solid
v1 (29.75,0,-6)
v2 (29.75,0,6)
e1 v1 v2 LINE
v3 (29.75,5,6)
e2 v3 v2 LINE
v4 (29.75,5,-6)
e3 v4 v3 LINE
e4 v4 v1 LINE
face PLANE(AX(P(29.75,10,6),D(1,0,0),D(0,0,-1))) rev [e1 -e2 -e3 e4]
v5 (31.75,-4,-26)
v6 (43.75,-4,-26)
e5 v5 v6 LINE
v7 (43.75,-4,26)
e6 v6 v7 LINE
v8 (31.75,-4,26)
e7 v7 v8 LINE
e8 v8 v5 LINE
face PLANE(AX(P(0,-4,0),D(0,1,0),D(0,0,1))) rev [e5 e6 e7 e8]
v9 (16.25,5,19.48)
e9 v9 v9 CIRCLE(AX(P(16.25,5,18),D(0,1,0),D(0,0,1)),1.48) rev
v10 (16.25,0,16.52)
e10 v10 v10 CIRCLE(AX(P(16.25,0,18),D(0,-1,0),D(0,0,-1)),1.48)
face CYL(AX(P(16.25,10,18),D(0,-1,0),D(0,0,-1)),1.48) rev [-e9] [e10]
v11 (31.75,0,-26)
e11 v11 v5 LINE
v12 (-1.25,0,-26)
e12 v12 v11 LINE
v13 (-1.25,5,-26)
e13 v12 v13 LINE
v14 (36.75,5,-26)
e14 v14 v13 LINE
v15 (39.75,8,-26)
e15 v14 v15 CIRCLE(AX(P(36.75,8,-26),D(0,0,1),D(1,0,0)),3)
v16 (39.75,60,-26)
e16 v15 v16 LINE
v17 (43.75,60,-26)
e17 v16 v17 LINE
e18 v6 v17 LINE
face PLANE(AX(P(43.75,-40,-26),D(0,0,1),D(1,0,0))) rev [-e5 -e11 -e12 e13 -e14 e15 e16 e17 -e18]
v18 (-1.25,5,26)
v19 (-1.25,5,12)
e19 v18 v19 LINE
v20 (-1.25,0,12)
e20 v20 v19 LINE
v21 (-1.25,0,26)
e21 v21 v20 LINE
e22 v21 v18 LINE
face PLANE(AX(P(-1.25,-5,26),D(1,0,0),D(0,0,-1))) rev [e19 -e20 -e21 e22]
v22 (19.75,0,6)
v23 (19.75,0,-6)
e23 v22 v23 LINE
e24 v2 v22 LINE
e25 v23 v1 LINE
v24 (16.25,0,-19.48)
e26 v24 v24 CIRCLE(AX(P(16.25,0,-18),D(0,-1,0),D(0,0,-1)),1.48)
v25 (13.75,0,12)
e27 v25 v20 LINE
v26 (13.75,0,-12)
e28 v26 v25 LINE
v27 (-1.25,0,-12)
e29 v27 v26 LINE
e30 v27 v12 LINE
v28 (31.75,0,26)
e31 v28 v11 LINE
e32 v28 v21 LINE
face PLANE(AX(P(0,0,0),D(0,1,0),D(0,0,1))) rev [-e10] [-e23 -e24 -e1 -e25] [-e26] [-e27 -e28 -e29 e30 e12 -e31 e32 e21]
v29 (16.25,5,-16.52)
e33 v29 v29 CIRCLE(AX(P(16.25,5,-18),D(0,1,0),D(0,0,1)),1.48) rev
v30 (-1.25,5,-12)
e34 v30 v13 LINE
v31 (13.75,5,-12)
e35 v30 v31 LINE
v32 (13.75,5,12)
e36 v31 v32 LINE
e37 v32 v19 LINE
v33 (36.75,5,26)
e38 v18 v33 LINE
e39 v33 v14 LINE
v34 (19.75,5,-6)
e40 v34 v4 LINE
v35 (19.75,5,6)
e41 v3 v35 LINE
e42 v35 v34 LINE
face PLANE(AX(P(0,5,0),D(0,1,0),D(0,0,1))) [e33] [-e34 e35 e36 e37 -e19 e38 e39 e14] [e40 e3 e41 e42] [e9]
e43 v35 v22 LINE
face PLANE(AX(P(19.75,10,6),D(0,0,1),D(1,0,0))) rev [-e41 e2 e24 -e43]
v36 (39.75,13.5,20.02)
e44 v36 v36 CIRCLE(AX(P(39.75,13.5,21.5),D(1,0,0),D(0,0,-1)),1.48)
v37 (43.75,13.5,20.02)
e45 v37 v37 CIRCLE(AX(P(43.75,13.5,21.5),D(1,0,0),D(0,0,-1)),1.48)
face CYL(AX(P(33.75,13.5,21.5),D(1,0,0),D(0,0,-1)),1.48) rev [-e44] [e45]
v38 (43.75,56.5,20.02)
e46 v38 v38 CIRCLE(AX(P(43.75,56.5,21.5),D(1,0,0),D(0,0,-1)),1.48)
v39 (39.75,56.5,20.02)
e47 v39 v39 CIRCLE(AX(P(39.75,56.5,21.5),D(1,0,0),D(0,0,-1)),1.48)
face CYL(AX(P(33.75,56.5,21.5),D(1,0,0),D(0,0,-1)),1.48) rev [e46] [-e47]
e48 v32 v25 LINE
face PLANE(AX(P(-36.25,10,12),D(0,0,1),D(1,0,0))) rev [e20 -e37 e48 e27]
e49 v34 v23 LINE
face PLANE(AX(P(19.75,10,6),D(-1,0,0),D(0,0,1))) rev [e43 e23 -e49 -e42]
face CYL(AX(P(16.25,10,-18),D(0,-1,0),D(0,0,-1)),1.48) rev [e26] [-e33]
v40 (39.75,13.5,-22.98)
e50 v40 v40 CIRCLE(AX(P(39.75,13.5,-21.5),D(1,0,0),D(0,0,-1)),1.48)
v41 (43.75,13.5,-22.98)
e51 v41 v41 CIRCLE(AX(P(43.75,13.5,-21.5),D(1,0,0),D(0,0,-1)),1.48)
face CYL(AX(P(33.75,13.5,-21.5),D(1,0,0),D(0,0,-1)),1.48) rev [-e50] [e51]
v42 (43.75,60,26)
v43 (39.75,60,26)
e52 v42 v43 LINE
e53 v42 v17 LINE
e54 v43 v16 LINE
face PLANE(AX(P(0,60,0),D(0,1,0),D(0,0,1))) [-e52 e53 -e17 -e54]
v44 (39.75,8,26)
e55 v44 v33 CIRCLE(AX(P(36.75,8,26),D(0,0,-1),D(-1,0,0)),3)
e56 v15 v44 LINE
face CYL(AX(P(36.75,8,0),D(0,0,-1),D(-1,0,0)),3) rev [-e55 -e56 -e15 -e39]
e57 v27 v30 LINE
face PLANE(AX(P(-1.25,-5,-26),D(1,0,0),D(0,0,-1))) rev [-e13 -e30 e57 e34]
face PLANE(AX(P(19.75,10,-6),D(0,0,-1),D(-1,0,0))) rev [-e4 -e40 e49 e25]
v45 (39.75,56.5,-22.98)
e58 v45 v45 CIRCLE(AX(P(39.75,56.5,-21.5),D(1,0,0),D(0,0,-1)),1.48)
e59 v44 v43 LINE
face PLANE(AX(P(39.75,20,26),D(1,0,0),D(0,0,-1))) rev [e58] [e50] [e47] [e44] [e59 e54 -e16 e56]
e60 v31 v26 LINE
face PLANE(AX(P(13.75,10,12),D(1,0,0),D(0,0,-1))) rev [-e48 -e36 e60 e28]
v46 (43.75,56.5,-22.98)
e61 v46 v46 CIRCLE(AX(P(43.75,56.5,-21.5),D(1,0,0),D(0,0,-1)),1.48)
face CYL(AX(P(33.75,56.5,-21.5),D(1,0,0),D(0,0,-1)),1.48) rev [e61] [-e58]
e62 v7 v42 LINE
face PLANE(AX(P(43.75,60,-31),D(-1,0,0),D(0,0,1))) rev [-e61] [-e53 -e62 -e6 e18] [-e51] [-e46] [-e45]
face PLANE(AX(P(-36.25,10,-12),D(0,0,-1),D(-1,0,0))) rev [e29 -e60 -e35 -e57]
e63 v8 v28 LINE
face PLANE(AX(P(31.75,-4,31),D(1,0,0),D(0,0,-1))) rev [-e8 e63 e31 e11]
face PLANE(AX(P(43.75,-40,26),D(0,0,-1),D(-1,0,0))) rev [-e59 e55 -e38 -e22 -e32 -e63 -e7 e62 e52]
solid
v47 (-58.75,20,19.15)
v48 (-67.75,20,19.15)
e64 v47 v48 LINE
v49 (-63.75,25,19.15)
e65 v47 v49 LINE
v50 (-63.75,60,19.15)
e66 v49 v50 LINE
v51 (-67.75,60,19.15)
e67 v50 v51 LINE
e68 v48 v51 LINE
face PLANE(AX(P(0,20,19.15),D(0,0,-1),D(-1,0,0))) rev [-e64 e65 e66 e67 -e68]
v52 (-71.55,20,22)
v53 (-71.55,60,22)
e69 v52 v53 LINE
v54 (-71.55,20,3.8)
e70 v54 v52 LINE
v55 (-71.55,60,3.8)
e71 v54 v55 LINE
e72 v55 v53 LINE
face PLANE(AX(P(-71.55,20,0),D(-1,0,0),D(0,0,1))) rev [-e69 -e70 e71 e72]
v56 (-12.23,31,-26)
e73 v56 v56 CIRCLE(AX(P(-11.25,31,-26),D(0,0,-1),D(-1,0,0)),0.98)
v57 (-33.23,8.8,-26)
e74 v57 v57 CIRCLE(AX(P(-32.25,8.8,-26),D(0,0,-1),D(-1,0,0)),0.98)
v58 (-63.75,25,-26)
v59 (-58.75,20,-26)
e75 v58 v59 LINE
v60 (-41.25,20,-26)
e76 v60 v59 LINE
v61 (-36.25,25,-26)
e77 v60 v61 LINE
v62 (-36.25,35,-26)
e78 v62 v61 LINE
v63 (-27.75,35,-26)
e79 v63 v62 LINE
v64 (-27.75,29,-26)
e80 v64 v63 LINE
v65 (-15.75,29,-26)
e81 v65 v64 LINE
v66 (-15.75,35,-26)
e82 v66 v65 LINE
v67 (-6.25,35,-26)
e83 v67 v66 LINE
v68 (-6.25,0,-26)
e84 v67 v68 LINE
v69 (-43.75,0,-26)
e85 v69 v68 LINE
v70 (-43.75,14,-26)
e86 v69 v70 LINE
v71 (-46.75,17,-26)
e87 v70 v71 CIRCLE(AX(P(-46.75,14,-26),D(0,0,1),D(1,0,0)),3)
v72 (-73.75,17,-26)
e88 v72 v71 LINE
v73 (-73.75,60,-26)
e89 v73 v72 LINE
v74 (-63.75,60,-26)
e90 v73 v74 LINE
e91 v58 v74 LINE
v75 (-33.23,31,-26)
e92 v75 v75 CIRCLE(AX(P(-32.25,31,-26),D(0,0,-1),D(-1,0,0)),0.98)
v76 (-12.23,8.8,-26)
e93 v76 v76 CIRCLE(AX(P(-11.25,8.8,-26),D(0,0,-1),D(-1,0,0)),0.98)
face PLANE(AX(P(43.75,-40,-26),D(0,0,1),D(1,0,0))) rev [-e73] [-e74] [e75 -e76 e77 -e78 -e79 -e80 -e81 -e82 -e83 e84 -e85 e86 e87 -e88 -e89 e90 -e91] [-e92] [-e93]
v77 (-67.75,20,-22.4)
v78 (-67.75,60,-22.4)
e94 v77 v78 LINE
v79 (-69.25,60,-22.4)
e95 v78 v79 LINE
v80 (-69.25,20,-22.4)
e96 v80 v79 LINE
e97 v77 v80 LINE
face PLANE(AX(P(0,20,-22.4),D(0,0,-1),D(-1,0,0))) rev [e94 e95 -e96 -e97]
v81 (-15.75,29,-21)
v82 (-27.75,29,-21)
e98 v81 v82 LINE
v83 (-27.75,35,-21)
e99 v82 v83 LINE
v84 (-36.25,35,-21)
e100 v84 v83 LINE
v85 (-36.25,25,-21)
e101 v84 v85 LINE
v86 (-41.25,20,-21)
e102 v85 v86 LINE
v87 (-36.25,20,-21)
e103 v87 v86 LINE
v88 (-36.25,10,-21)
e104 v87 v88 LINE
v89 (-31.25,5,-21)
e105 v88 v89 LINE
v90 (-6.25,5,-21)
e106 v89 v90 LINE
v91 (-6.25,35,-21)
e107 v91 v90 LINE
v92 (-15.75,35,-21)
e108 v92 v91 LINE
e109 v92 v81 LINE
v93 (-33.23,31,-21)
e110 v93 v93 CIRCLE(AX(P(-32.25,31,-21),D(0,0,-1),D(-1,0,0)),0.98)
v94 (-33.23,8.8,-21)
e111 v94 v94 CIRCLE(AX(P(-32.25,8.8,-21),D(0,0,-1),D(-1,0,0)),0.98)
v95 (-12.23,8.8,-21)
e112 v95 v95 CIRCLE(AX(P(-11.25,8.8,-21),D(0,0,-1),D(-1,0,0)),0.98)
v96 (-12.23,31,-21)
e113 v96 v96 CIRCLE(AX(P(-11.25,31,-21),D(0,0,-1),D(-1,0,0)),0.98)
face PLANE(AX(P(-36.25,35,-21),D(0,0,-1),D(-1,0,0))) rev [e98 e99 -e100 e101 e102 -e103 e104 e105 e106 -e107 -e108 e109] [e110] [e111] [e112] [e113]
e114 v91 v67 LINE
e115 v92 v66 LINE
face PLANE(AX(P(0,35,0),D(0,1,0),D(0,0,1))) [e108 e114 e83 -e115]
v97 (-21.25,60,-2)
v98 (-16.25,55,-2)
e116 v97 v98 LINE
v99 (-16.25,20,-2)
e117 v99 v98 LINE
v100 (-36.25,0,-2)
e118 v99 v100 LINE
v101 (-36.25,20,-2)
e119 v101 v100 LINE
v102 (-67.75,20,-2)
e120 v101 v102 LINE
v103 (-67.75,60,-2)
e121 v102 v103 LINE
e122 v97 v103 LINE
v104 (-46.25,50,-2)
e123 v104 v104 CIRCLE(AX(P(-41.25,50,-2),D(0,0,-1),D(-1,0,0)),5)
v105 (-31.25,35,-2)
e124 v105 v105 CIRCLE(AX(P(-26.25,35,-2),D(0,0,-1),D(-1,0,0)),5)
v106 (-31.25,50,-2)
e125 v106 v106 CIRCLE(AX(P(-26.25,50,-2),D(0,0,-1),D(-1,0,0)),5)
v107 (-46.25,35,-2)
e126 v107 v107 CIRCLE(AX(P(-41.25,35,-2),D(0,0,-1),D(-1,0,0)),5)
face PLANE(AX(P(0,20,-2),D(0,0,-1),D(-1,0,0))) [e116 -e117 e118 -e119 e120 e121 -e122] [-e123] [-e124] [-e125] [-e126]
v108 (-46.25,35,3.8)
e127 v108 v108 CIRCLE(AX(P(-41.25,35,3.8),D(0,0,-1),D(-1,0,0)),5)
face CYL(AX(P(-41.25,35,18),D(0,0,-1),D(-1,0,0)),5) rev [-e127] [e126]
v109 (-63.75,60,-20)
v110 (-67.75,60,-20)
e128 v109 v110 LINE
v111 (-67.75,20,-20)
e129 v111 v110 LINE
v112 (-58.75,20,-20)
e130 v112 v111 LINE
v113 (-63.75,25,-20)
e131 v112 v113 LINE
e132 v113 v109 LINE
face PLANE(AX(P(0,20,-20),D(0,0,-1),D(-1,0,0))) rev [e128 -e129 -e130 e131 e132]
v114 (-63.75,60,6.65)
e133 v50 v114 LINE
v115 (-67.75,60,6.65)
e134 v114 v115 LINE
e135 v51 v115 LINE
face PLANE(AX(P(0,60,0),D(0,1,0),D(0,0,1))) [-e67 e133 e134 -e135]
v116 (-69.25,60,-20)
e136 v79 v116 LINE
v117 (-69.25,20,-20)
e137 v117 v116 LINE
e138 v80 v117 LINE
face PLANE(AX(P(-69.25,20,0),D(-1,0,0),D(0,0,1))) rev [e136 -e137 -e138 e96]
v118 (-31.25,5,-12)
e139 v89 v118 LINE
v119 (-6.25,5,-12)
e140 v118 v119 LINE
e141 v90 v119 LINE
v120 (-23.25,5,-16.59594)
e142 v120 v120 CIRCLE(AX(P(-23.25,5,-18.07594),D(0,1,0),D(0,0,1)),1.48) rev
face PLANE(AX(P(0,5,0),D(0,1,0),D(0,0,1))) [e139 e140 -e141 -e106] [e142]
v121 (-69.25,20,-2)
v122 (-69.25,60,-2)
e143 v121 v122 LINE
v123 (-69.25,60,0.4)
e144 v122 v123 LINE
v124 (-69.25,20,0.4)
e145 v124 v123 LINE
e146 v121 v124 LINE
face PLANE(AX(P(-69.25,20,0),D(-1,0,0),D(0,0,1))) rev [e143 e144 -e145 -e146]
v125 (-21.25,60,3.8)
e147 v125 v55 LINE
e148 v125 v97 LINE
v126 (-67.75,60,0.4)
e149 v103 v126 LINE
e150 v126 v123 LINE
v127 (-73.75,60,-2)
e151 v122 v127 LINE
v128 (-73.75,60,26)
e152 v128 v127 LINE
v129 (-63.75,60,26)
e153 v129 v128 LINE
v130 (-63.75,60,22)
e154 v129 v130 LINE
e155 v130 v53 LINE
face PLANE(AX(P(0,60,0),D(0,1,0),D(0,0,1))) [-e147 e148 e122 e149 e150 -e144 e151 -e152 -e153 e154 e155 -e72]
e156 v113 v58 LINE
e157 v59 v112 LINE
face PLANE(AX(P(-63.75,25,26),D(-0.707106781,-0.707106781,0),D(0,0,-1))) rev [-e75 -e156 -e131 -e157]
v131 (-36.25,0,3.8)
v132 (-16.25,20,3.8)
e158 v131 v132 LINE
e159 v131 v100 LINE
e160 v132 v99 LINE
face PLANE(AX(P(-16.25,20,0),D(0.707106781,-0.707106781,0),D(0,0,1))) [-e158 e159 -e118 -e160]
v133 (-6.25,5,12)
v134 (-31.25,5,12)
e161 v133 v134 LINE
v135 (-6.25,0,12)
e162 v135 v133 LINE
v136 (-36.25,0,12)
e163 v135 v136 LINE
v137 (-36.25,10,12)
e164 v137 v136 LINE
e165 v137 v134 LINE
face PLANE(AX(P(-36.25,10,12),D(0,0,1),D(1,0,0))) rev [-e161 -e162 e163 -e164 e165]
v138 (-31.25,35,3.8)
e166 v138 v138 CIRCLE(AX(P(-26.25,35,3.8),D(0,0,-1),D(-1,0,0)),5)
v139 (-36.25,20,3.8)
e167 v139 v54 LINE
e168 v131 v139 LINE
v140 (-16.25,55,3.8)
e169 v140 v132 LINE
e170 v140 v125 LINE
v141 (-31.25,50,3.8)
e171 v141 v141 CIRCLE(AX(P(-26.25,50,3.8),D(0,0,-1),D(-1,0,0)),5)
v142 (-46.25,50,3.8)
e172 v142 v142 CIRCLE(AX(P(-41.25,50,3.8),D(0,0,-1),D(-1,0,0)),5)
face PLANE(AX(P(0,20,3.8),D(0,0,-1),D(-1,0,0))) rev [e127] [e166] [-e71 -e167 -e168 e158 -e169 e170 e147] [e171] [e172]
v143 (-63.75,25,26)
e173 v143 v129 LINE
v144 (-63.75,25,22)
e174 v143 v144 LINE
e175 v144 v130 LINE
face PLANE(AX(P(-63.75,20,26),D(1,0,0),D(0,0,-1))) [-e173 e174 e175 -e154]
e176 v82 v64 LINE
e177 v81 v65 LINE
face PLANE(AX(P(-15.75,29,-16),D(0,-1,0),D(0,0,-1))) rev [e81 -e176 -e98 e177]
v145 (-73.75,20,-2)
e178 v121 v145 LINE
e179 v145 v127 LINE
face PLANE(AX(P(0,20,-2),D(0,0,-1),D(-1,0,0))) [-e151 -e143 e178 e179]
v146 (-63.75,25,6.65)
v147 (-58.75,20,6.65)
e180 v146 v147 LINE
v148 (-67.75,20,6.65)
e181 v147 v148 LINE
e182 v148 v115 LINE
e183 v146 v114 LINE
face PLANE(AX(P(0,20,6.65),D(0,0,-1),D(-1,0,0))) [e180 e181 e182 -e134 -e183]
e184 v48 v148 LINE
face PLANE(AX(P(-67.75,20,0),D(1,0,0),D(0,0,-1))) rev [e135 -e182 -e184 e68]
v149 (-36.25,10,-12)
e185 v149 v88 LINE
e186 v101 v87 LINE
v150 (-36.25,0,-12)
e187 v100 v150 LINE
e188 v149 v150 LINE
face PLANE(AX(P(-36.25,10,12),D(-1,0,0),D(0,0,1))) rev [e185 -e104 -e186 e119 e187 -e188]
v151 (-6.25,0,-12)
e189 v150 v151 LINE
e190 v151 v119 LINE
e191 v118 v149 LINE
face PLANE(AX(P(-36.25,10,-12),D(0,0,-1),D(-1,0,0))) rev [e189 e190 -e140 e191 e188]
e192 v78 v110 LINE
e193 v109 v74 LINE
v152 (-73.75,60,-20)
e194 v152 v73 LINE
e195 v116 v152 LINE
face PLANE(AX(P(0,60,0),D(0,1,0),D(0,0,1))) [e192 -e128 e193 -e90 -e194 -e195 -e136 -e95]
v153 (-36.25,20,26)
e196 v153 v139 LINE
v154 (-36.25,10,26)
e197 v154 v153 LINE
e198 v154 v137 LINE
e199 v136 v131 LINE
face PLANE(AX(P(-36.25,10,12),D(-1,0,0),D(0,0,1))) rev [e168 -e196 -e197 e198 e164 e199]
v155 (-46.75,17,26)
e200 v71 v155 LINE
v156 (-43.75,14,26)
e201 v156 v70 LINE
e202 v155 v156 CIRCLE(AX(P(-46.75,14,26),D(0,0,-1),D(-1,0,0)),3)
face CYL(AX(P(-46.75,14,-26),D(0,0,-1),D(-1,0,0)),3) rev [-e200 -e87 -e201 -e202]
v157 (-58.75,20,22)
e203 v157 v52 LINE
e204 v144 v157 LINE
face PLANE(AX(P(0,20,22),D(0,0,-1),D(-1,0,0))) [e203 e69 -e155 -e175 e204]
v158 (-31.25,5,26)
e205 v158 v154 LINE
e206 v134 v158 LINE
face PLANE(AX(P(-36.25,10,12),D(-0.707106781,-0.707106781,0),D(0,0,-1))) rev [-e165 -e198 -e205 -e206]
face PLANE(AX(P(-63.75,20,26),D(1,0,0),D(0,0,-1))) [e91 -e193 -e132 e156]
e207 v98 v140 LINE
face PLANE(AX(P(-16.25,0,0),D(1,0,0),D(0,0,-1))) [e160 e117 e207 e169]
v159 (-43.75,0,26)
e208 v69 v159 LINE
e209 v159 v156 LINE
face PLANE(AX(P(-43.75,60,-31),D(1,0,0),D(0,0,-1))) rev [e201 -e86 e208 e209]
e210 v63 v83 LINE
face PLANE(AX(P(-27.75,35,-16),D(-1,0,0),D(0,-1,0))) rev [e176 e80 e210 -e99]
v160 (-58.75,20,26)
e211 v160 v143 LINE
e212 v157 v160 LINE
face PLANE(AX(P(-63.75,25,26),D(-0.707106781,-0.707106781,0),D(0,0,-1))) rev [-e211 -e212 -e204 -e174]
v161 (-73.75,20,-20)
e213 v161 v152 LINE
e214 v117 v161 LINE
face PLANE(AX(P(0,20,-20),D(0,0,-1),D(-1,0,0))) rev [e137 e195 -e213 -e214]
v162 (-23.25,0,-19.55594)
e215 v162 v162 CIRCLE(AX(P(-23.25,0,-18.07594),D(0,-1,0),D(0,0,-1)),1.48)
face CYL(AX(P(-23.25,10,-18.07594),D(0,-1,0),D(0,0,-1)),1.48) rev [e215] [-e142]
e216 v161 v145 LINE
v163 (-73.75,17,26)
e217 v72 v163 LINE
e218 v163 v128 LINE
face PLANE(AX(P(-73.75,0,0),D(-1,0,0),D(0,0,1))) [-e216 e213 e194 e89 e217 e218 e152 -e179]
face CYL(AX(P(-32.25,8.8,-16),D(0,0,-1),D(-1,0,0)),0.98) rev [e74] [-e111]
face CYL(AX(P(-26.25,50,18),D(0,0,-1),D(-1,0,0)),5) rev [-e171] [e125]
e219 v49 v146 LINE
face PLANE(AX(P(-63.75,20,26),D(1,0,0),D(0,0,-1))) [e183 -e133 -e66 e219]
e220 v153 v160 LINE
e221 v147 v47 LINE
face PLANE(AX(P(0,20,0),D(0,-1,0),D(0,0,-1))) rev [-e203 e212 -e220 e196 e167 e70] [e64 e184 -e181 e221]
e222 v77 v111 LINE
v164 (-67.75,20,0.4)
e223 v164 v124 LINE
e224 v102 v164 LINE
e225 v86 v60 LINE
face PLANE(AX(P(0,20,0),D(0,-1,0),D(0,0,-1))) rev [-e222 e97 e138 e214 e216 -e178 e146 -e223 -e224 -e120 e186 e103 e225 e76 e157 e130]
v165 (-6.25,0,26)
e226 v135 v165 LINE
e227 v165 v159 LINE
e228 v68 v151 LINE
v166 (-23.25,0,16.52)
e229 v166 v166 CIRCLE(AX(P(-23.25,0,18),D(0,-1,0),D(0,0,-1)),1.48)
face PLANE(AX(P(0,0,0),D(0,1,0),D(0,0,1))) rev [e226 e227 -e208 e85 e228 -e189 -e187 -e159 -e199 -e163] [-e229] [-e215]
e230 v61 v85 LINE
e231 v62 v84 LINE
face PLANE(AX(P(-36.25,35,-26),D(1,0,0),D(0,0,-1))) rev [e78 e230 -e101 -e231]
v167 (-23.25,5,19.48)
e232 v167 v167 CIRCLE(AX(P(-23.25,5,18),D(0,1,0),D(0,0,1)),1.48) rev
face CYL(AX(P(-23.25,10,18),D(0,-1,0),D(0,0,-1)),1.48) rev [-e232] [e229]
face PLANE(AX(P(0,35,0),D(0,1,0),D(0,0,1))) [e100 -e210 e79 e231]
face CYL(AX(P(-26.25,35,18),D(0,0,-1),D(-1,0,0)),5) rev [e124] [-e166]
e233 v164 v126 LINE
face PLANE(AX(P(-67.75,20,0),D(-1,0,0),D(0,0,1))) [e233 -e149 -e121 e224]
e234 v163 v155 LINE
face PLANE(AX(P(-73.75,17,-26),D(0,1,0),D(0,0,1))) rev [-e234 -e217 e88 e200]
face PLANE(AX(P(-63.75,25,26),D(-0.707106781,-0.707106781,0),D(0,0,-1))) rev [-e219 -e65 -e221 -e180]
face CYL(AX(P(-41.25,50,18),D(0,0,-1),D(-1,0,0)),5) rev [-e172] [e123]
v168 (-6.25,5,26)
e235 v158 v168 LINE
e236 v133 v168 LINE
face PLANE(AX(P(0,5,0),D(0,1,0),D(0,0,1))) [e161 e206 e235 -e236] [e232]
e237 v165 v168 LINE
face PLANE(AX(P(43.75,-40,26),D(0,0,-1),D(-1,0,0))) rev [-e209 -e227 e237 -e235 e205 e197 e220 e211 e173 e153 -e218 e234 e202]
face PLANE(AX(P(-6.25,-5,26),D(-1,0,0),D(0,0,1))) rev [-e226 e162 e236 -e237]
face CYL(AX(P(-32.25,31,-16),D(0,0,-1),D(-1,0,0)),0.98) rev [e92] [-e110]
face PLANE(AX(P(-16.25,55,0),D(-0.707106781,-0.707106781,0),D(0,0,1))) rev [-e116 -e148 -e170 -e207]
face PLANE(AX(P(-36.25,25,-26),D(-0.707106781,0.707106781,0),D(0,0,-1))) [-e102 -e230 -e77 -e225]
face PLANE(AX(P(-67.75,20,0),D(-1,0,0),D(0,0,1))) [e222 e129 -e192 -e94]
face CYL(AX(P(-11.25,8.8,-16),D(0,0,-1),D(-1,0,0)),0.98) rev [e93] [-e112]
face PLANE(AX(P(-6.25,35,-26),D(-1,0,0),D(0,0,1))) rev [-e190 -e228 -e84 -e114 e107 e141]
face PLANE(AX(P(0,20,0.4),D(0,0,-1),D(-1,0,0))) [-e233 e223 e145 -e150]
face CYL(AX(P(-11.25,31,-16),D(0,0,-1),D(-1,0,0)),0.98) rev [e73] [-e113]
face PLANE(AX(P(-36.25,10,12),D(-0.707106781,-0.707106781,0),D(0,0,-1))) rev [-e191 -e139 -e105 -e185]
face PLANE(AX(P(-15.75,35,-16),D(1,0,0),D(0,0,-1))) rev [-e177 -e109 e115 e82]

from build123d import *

# Parameters (mm, degrees)
SKETCH_1_W           = 87.5
SKETCH_1_H           = 62
EXTRUDE_1_DEPTH      = 60
SKETCH_2_W           = 12
SKETCH_2_H           = 62
EXTRUDE_2_DEPTH      = 4
SKETCH_4_R           = 1.48
SKETCH_4_W           = 10
SKETCH_4_H           = 12
SKETCH_4_W_2         = 50
SKETCH_4_H_2         = 24
CUT_EXTRUDE_2_DEPTH  = 10
SKETCH_6_W           = 87.5
SKETCH_6_H           = 5
CUT_EXTRUDE_3_DEPTH  = 100
SKETCH_7_W           = 52
SKETCH_7_H           = 43
EXTRUDE_3_DEPTH      = 30
SKETCH_9_W           = 103.5
SKETCH_9_H           = 52
CUT_EXTRUDE_4_DEPTH  = 40
SKETCH_10_W          = 76
SKETCH_10_H          = 52
CUT_EXTRUDE_5_DEPTH  = 15
SKETCH_11_R          = 1.48
CUT_EXTRUDE_6_DEPTH  = 10
CUT_EXTRUDE_7_DEPTH  = 40
SKETCH_12_4_W        = 4
SKETCH_12_4_H        = 18
SKETCH_12_4_W_2      = 4.5
CUT_EXTRUDE_8_DEPTH  = 40
SKETCH_13_W          = 27.5
SKETCH_13_H          = 5.8
EXTRUDE_4_DEPTH      = 40
SKETCH_14_W          = 30
SKETCH_14_H          = 5
EXTRUDE_5_DEPTH      = 30
SKETCH_15_R          = 0.98
SKETCH_15_W          = 12
SKETCH_15_H          = 6
CUT_EXTRUDE_9_DEPTH  = 10
FILLET_2_R           = 3
SKETCH_16_W          = 5
SKETCH_16_H          = 14
CUT_EXTRUDE_10_DEPTH = 10
CHAMFER_4_SIZE       = 5
SKETCH_17_W          = 5.8
SKETCH_17_H          = 40
EXTRUDE_6_DEPTH      = 20
CHAMFER_5_SIZE       = 20
CHAMFER_6_SIZE       = 5
SKETCH_18_R          = 5
CUT_EXTRUDE_11_DEPTH = 20
FILLET_3_R           = 3


with BuildPart() as part:
    # 草图1 → 凸台-拉伸1 (new body)
    with BuildSketch(Plane(origin=(0, 0, 0), x_dir=(1, 0, 0), z_dir=(0, 1, 0))):
        Rectangle(SKETCH_1_W, SKETCH_1_H)
    extrude(amount=EXTRUDE_1_DEPTH)

    # 草图2 → 凸台-拉伸2 (add)
    with BuildSketch(Plane.XZ):
        with Locations((37.75, 0)):
            Rectangle(SKETCH_2_W, SKETCH_2_H)
    extrude(amount=EXTRUDE_2_DEPTH)

    # 草图4 → 切除-拉伸2 (cut)
    with BuildSketch(Plane.XZ):
        with Locations(Location((16.25, -18, 0), (0, 0, 270))):
            Circle(SKETCH_4_R)
        with Locations(Location((-23.25, -18.075939793, 0), (0, 0, 270))):
            Circle(SKETCH_4_R)
        with Locations(Location((-23.25, 18, 0), (0, 0, 270))):
            Circle(SKETCH_4_R)
        with Locations(Location((16.25, 18, 0), (0, 0, 270))):
            Circle(SKETCH_4_R)
        with Locations((24.75, 0)):
            Rectangle(SKETCH_4_W, SKETCH_4_H)
        with Locations((-11.25, 0)):
            Rectangle(SKETCH_4_W_2, SKETCH_4_H_2)
    extrude(amount=-CUT_EXTRUDE_2_DEPTH, mode=Mode.SUBTRACT)

    # 草图6 → 切除-拉伸3 (cut)
    with BuildSketch(Plane(origin=(0, 60, 0), x_dir=(1, 0, 0), z_dir=(0, 1, 0))):
        with Locations((0, -28.5)):
            Rectangle(SKETCH_6_W, SKETCH_6_H)
        with Locations((0, 28.5)):
            Rectangle(SKETCH_6_W, SKETCH_6_H)
    extrude(amount=-CUT_EXTRUDE_3_DEPTH, mode=Mode.SUBTRACT)

    # 草图7 → 凸台-拉伸3 (add)
    with BuildSketch(Plane.ZY.offset(43.75)):
        with Locations((0, 38.5)):
            Rectangle(SKETCH_7_W, SKETCH_7_H)
    extrude(amount=EXTRUDE_3_DEPTH)

    # 草图9 → 切除-拉伸4 (cut)
    with BuildSketch(Plane(origin=(0, 60, 0), x_dir=(1, 0, 0), z_dir=(0, 1, 0))):
        with Locations((-12, 0)):
            Rectangle(SKETCH_9_W, SKETCH_9_H)
    extrude(amount=-CUT_EXTRUDE_4_DEPTH, mode=Mode.SUBTRACT)

    # 草图10 → 切除-拉伸5 (cut)
    with BuildSketch(Plane(origin=(0, 20, 0), x_dir=(1, 0, 0), z_dir=(0, 1, 0))):
        with Locations((1.75, 0)):
            Rectangle(SKETCH_10_W, SKETCH_10_H)
    extrude(amount=-CUT_EXTRUDE_5_DEPTH, mode=Mode.SUBTRACT)

    # 草图11 → 切除-拉伸6 (cut)
    with BuildSketch(Plane(origin=(43.75, 0, 0), x_dir=(0, 0, -1), z_dir=(1, 0, 0))):
        with Locations((-21.5, 56.5)):
            Circle(SKETCH_11_R)
        with Locations((21.5, 56.5)):
            Circle(SKETCH_11_R)
        with Locations((-21.5, 13.5)):
            Circle(SKETCH_11_R)
        with Locations((21.5, 13.5)):
            Circle(SKETCH_11_R)
    extrude(amount=-CUT_EXTRUDE_6_DEPTH, mode=Mode.SUBTRACT)

    # 草图12 → 切除-拉伸7 (cut)
    with BuildSketch(Plane(origin=(0, 60, 0), x_dir=(1, 0, 0), z_dir=(0, 1, 0))):
        Polygon((-63.75, -22), (-63.75, -19.15), (-67.75, -19.15), (-67.75, -6.65), (-63.75, -6.65), (-63.75, -3.8), (-71.55, -3.8), (-71.55, -22), align=None)
    extrude(amount=-CUT_EXTRUDE_7_DEPTH, mode=Mode.SUBTRACT)

    # 草图12<4> → 切除-拉伸8 (cut)
    with BuildSketch(Plane(origin=(0, 60, 0), x_dir=(1, 0, 0), z_dir=(0, 1, 0))):
        Polygon((-67.75, -0.4), (-67.75, 2), (-67.75, 20), (-67.75, 22.4), (-69.25, 22.4), (-69.25, 20), (-69.25, 2), (-69.25, -0.4), align=None)
        with Locations((-65.75, 11)):
            Rectangle(SKETCH_12_4_W, SKETCH_12_4_H)
        with Locations((-71.5, 11)):
            Rectangle(SKETCH_12_4_W_2, SKETCH_12_4_H)
    extrude(amount=-CUT_EXTRUDE_8_DEPTH, mode=Mode.SUBTRACT)

    # 草图13 → 凸台-拉伸4 (add)
    with BuildSketch(Plane(origin=(0, 20, 0), x_dir=(1, 0, 0), z_dir=(0, 1, 0))):
        with Locations((-50, -0.9)):
            Rectangle(SKETCH_13_W, SKETCH_13_H)
    extrude(amount=EXTRUDE_4_DEPTH)

    # 草图14 → 凸台-拉伸5 (add)
    with BuildSketch(Plane(origin=(0, 5, 0), x_dir=(1, 0, 0), z_dir=(0, 1, 0))):
        with Locations((-21.25, 23.5)):
            Rectangle(SKETCH_14_W, SKETCH_14_H)
    extrude(amount=EXTRUDE_5_DEPTH)

    # 草图15 → 切除-拉伸9 (cut)
    with BuildSketch(Plane(origin=(0, 0, -26), x_dir=(-1, 0, 0), z_dir=(0, 0, -1))):
        with Locations((11.25, 31)):
            Circle(SKETCH_15_R)
        with Locations((32.25, 31)):
            Circle(SKETCH_15_R)
        with Locations((11.25, 8.8)):
            Circle(SKETCH_15_R)
        with Locations((32.25, 8.8)):
            Circle(SKETCH_15_R)
        with Locations((21.75, 32)):
            Rectangle(SKETCH_15_W, SKETCH_15_H)
    extrude(amount=-CUT_EXTRUDE_9_DEPTH, mode=Mode.SUBTRACT)

    # 圆角2
    fillet_2_edges = [part.edges().sort_by_distance(p)[0] for p in [
        (-43.75, 17, 0),
    ]]
    fillet(fillet_2_edges, radius=FILLET_2_R)

    # 草图16 → 切除-拉伸10 (cut)
    with BuildSketch(Plane(origin=(0, 5, 0), x_dir=(1, 0, 0), z_dir=(0, 1, 0))):
        with Locations((-3.75, -19)):
            Rectangle(SKETCH_16_W, SKETCH_16_H)
        with Locations((-3.75, 19)):
            Rectangle(SKETCH_16_W, SKETCH_16_H)
    extrude(amount=-CUT_EXTRUDE_10_DEPTH, mode=Mode.SUBTRACT)


with BuildPart() as cut_extrude_10_piece_1:
    # of the separate pieces the step leaves, piece 1, a body of its own (cut_extrude_10_pieces)
    add(part.part.solids().sort_by_distance((-43.75, 14, -26))[0])

    # 倒角4
    chamfer_4_edges = [cut_extrude_10_piece_1.edges().sort_by_distance(p)[0] for p in [
        (-36.25, 20, -23.5),
        (-36.25, 5, 19),
        (-36.25, 5, -16.5),
        (-63.75, 20, 12.9),
        (-63.75, 20, 24),
        (-63.75, 20, -23),
    ]]
    chamfer(chamfer_4_edges, length=CHAMFER_4_SIZE)

    # 草图17 → 凸台-拉伸6 (add)
    with BuildSketch(Plane(origin=(-36.25, 0, 0), x_dir=(0, 0, -1), z_dir=(1, 0, 0))):
        with Locations((-0.9, 40)):
            Rectangle(SKETCH_17_W, SKETCH_17_H)
    extrude(amount=EXTRUDE_6_DEPTH)

    # 倒角5
    chamfer_5_edges = [cut_extrude_10_piece_1.edges().sort_by_distance(p)[0] for p in [
        (-36.25, 20, 0.9),
    ]]
    chamfer(chamfer_5_edges, length=CHAMFER_5_SIZE - 0.0001)  # a hair under: the kernel refuses the full size

    # 倒角6
    chamfer_6_edges = [cut_extrude_10_piece_1.edges().sort_by_distance(p)[0] for p in [
        (-16.25, 60, 0.9),
    ]]
    chamfer(chamfer_6_edges, length=CHAMFER_6_SIZE)

    # 草图18 → 切除-拉伸11 (cut)
    with BuildSketch(Plane(origin=(0, 0, -2), x_dir=(-1, 0, 0), z_dir=(0, 0, -1))):
        with Locations((26.25, 50)):
            Circle(SKETCH_18_R)
        with Locations((41.25, 50)):
            Circle(SKETCH_18_R)
        with Locations((26.25, 35)):
            Circle(SKETCH_18_R)
        with Locations((41.25, 35)):
            Circle(SKETCH_18_R)
    extrude(amount=-CUT_EXTRUDE_11_DEPTH, mode=Mode.SUBTRACT)


with BuildPart() as cut_extrude_10_piece_2:
    # of the separate pieces the step leaves, piece 2, a body of its own (cut_extrude_10_pieces)
    add(part.part.solids().sort_by_distance((-1.25, 0, -26))[0])

    # 圆角3
    fillet_3_edges = [cut_extrude_10_piece_2.edges().sort_by_distance(p)[0] for p in [
        (39.75, 5, 0),
    ]]
    fillet(fillet_3_edges, radius=FILLET_3_R)


solid = Compound([cut_extrude_10_piece_1.part, cut_extrude_10_piece_2.part])
